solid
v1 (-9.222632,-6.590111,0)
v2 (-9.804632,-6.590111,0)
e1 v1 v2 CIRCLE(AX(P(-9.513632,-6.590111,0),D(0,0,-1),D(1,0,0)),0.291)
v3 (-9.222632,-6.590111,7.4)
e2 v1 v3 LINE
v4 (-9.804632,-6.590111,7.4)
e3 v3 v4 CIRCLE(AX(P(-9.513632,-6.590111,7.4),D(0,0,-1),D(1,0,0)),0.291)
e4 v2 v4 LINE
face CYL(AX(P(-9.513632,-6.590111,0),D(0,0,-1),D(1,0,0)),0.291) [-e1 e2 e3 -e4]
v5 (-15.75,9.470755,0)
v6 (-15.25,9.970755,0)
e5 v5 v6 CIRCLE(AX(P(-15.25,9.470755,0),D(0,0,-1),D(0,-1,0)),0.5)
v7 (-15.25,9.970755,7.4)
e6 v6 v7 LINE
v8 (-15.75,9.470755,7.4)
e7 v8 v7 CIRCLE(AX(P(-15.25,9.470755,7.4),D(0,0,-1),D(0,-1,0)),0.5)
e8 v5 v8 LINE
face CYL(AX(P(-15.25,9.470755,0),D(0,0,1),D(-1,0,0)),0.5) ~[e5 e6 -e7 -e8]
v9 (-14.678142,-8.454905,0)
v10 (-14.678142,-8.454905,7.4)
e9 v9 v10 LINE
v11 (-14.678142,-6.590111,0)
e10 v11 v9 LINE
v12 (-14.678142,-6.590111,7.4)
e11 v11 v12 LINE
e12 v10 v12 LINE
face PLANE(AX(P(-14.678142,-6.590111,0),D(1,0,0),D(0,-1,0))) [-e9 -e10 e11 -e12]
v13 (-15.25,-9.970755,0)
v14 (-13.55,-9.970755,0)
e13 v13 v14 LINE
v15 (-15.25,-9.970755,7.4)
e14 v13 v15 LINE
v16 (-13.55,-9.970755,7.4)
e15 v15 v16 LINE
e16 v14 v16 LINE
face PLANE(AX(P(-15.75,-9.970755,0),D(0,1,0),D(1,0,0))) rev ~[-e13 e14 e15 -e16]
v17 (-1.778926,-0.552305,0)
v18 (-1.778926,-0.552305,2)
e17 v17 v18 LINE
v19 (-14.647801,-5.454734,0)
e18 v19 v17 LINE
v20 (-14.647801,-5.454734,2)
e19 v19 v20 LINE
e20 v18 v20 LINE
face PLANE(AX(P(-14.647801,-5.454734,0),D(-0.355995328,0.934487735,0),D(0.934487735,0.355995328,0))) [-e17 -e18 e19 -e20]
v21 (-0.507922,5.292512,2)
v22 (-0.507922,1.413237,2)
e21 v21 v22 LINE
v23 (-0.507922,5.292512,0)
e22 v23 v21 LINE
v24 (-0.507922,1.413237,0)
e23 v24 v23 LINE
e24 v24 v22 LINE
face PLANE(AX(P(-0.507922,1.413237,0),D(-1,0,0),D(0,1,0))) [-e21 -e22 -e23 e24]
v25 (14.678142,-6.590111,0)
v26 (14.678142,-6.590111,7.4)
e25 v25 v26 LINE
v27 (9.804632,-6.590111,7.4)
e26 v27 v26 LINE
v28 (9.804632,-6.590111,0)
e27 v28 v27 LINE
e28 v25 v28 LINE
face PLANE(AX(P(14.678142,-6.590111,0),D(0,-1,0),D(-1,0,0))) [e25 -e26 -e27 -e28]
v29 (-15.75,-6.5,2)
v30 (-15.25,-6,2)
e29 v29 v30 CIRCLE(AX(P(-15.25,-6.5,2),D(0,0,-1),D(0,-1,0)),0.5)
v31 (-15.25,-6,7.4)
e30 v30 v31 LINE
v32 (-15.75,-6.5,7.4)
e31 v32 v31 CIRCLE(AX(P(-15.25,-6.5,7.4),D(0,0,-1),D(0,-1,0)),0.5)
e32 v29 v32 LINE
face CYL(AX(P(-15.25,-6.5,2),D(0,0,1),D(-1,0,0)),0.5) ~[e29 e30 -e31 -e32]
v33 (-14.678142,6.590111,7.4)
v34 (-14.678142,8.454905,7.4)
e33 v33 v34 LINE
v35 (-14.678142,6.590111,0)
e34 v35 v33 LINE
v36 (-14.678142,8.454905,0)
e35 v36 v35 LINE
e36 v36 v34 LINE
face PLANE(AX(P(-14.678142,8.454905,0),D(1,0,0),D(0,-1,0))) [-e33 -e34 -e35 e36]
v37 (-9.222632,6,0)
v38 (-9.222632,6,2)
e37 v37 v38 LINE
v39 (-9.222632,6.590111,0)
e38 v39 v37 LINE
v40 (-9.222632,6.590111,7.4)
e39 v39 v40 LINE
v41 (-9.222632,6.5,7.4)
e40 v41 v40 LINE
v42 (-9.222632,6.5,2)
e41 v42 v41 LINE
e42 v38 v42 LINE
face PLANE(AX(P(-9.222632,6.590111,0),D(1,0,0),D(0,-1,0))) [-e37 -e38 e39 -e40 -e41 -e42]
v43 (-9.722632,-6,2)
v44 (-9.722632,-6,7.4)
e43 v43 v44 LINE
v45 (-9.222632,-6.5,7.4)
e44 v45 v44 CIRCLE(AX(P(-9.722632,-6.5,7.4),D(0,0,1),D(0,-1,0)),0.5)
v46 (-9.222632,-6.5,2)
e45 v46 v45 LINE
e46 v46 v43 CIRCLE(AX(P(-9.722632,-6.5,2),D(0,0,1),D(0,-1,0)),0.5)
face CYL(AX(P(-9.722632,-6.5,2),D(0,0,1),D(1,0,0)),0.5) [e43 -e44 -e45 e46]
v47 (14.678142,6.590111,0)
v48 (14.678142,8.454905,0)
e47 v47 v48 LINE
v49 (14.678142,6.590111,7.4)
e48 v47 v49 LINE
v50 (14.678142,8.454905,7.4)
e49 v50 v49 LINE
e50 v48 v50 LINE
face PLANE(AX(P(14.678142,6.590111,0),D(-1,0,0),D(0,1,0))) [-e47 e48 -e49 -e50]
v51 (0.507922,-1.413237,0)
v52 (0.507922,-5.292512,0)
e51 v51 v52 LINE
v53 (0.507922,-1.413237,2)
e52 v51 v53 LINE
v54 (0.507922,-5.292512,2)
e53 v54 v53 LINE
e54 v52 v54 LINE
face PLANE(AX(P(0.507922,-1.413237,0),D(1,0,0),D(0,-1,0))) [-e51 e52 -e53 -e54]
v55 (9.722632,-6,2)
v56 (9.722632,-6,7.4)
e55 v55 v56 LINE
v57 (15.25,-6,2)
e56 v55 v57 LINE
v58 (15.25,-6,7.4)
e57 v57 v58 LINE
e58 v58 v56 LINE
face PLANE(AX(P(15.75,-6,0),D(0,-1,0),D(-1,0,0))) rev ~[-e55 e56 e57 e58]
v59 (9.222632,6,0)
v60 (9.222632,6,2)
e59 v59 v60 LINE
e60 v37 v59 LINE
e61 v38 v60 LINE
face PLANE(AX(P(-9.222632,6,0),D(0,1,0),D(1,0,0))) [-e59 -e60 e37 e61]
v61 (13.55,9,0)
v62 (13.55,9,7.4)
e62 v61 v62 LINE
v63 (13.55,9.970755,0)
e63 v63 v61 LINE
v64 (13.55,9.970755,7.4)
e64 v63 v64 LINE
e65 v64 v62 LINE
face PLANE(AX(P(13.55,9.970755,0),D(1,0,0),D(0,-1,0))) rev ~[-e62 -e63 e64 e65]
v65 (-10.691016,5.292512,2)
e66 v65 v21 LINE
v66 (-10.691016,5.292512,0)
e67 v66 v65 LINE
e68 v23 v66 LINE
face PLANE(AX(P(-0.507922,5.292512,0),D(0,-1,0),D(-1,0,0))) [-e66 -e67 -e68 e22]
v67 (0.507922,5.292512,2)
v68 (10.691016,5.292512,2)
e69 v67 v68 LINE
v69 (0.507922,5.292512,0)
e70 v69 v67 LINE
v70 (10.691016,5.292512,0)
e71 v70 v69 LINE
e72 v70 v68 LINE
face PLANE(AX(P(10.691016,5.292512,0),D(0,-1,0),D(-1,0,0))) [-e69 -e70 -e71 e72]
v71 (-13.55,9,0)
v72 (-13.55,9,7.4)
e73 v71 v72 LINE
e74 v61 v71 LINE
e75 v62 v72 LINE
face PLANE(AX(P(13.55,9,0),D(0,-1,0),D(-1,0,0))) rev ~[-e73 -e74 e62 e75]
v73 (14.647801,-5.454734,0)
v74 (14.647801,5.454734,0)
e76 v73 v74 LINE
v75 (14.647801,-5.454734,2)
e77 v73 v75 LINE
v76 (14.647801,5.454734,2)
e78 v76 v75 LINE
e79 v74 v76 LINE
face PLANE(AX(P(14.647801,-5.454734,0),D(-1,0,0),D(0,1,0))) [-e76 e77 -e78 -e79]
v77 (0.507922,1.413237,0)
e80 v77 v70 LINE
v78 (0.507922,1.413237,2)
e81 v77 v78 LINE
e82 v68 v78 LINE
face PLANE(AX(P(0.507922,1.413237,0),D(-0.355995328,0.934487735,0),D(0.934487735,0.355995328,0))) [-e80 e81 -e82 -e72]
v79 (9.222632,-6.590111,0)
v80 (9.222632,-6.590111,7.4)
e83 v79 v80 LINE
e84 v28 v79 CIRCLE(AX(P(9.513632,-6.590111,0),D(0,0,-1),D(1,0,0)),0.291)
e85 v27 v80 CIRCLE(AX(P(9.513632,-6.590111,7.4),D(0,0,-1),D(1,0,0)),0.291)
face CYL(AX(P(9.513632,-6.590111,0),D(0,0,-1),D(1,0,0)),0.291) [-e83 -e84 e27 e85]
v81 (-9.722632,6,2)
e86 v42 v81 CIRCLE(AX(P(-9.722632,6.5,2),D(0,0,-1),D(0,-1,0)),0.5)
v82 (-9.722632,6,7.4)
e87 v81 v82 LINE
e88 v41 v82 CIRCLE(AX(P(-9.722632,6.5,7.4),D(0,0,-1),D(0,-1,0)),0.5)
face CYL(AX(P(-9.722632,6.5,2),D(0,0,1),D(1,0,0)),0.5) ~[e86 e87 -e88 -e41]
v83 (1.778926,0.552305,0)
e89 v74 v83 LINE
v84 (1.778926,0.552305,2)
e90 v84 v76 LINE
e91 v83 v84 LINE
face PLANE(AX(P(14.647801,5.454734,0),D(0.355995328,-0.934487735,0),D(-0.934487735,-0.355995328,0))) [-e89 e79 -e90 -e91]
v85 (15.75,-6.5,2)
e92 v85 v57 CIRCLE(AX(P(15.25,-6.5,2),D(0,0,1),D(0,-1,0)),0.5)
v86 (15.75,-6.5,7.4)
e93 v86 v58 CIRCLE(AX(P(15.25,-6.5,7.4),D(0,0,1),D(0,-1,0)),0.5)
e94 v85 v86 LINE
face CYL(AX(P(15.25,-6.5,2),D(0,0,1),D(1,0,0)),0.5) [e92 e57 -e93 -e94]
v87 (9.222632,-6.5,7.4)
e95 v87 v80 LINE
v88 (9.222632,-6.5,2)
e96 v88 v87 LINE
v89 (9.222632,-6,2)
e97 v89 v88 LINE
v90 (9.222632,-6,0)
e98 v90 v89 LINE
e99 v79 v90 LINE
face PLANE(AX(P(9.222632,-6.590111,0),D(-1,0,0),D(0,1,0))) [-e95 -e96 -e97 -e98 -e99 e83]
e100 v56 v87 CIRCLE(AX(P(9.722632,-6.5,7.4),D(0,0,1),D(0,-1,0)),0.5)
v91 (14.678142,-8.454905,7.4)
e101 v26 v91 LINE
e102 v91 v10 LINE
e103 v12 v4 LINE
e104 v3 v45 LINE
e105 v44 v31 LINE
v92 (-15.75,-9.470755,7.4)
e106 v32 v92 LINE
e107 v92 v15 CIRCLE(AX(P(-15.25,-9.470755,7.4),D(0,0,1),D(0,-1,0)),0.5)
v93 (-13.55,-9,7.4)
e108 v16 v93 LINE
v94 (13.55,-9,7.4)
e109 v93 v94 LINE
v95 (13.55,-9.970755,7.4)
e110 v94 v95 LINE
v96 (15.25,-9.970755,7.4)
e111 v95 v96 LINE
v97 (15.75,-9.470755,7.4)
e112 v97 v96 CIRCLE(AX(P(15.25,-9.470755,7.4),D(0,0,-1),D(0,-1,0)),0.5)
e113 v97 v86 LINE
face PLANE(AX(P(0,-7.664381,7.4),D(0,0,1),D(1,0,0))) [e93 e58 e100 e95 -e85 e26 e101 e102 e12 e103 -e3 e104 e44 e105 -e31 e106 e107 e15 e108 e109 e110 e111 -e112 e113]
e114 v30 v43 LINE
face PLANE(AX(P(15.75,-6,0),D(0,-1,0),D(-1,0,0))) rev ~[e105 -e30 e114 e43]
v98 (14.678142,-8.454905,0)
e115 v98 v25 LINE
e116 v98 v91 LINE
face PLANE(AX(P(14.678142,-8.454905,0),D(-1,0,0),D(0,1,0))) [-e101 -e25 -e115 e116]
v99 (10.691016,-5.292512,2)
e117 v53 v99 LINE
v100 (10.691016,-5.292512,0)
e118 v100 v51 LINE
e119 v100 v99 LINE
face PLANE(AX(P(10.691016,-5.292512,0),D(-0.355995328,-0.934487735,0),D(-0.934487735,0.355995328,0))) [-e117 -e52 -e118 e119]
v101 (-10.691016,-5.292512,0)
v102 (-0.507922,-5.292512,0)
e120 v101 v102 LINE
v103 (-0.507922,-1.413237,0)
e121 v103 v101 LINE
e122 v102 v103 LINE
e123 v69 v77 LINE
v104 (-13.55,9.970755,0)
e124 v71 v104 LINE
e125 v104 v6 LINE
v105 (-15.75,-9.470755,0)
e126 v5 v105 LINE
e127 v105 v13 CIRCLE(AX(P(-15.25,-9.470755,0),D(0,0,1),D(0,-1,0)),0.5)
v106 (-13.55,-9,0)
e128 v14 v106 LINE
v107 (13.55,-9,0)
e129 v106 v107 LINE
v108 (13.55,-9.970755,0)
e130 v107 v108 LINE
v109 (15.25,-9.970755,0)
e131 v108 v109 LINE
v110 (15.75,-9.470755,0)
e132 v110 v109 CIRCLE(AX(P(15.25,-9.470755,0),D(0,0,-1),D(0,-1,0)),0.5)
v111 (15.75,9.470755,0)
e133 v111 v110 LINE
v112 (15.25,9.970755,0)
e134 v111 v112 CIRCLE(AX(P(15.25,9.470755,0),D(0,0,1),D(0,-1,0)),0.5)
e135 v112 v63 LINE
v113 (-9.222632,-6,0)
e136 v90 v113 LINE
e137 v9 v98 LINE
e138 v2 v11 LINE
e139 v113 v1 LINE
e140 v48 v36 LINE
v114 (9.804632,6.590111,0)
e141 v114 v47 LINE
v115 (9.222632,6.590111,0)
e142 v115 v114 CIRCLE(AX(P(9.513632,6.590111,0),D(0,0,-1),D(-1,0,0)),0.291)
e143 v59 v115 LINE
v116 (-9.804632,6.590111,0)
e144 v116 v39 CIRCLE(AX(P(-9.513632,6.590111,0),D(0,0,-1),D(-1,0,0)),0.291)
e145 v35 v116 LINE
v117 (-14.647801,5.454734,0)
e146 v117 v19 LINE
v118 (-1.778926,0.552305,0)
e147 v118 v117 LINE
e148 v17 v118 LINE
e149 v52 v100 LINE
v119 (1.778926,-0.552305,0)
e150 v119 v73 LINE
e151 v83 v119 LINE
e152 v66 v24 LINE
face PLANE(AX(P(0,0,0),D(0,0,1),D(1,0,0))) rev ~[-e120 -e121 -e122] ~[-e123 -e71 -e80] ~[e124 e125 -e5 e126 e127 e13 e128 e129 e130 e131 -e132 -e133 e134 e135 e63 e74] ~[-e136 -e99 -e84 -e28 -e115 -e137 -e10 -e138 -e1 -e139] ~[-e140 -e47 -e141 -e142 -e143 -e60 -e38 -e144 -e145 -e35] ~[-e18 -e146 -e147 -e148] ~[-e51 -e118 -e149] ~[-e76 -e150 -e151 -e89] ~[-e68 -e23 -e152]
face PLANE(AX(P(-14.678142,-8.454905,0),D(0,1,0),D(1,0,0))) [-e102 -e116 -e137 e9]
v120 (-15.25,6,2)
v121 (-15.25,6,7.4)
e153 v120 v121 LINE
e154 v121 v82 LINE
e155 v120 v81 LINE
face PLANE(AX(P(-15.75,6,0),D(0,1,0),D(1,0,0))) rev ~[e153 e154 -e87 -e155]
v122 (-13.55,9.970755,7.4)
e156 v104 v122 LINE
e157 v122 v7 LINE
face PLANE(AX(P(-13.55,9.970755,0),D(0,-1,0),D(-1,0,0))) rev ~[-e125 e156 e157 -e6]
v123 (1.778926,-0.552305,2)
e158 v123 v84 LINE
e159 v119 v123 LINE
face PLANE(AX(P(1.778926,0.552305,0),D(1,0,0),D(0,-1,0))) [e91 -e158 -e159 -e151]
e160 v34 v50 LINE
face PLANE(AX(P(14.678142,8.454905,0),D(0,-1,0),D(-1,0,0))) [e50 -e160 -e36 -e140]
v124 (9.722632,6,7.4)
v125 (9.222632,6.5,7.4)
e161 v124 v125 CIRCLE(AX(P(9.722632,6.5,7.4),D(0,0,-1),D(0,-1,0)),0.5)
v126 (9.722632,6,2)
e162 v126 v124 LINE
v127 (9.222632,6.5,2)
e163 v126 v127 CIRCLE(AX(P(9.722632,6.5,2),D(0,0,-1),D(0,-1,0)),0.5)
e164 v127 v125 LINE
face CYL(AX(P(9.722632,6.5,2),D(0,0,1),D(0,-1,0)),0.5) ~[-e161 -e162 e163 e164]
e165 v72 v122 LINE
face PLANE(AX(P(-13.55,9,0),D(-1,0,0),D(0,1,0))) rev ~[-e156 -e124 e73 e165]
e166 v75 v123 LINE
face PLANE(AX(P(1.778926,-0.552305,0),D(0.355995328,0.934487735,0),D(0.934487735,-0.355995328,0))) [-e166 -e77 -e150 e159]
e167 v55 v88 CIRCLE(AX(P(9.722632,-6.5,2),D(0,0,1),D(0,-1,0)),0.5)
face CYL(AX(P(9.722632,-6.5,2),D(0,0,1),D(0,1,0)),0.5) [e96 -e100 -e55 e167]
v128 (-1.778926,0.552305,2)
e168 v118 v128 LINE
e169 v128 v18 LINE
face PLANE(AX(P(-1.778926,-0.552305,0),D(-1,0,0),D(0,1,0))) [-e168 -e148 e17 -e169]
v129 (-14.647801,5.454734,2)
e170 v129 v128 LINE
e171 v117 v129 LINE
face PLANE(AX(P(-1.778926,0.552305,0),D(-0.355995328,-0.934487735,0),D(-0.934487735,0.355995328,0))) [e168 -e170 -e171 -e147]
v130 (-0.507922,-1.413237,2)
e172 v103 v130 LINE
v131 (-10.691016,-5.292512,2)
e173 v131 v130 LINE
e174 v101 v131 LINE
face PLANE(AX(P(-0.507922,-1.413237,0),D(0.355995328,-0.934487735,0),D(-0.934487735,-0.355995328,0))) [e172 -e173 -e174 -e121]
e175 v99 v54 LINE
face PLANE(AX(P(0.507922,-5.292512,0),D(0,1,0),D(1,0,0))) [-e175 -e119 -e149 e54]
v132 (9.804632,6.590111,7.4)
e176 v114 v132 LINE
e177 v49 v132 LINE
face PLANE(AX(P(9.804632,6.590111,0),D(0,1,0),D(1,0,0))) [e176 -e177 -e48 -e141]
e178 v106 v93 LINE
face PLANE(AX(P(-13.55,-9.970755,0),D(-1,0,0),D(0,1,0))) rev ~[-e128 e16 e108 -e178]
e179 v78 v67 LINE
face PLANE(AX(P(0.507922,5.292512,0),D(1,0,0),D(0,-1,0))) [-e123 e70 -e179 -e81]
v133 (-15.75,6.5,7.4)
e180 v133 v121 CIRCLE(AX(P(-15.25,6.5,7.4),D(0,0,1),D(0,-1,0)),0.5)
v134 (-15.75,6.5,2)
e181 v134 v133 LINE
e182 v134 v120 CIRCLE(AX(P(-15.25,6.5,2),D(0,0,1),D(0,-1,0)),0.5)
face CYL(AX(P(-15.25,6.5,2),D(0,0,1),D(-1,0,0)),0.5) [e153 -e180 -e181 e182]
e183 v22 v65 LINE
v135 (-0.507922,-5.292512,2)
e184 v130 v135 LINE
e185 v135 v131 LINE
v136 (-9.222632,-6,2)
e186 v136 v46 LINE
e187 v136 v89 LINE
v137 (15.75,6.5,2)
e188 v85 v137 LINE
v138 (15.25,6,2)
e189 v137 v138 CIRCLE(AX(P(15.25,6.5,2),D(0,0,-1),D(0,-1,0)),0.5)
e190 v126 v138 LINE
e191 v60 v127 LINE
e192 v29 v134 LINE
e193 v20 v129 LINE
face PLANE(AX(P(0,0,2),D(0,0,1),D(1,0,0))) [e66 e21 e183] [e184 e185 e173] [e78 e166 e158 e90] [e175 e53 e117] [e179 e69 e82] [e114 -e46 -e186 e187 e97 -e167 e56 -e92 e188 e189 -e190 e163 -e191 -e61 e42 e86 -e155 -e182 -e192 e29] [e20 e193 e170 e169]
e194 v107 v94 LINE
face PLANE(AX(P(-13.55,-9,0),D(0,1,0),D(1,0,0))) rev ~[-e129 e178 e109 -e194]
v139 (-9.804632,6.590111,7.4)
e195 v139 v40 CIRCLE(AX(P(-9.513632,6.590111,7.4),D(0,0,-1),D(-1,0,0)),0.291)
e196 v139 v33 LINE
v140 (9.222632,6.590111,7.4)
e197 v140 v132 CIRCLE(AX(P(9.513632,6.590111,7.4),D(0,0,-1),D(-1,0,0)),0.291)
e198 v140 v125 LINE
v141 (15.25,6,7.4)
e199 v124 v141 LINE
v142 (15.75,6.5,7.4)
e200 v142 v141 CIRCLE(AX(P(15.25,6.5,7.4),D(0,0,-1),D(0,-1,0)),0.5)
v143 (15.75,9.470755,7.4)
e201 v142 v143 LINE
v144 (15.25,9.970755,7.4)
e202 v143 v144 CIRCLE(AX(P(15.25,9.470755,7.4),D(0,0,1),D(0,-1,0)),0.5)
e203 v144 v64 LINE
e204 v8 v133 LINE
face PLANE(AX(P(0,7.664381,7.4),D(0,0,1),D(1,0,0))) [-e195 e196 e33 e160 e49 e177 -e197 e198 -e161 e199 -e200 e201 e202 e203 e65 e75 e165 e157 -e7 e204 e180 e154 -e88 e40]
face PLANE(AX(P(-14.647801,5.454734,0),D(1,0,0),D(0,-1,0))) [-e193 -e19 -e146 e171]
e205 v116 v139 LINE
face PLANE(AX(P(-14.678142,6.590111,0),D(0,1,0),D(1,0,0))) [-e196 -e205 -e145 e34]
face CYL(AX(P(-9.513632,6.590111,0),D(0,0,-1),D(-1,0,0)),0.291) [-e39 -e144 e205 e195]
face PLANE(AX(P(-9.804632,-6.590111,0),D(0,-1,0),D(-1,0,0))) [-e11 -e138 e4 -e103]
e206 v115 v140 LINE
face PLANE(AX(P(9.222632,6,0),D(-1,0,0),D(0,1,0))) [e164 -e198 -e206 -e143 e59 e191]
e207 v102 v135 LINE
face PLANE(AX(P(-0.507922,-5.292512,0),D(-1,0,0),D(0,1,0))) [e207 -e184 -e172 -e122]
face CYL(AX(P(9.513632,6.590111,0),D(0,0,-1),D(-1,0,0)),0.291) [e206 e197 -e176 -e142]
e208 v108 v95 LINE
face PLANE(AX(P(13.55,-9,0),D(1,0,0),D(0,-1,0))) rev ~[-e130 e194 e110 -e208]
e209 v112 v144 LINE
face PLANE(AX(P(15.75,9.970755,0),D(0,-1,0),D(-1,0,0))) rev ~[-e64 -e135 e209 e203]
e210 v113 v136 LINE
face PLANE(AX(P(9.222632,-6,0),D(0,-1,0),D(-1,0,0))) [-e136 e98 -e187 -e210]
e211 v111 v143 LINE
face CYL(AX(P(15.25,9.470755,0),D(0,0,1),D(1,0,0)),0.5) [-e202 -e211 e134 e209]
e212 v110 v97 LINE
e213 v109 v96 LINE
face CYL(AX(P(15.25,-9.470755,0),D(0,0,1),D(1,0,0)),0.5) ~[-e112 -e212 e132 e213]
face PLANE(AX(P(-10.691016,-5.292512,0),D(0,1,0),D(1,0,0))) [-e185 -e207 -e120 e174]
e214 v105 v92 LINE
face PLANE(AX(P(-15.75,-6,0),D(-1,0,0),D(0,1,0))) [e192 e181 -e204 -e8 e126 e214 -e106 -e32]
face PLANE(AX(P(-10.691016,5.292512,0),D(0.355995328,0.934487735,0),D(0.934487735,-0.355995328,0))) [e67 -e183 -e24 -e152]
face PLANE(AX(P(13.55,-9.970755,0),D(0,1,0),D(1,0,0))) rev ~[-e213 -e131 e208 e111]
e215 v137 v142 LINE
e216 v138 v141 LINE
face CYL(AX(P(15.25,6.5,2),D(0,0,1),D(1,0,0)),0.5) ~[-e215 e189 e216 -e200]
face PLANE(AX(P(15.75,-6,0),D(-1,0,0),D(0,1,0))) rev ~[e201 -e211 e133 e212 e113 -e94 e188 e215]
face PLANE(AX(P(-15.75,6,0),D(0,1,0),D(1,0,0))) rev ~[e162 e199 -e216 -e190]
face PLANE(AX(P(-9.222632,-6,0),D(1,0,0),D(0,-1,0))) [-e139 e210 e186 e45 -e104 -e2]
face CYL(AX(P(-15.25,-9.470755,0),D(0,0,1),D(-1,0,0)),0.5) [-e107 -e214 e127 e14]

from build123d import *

# Parameters (mm, degrees)
F1_DEPTH = 7.4
F0_W     = 31.5
F0_H     = 12
F2_DEPTH = 2
F4_DEPTH = 25
F5_R     = 0.5
F6_R     = 0.5


# Not quite as in the source:
# - a feature names something its author has since deleted; it is built from what else it names


with BuildPart() as f1:
    # F0 (on Top) → F1 (new body)
    with BuildSketch(Plane.XY):
        Polygon((15.75, -9), (15.75, -6), (-15.75, -6), (-15.75, -9), (-15.75, -9.970754717), (-13.55, -9.970754717), (-13.55, -9), (13.55, -9), (13.55, -9.970754717), (15.75, -9.970754717), align=None)
    extrude(amount=F1_DEPTH)



with BuildPart() as f1b:
    # F0 (on Top) → F1, piece 2 (new body)
    with BuildSketch(Plane.XY):
        Polygon((13.55, 9.970754717), (13.55, 9), (-13.55, 9), (-13.55, 9.970754717), (-15.75, 9.970754717), (-15.75, 9), (-15.75, 6), (15.75, 6), (15.75, 9), (15.75, 9.970754717), align=None)
    extrude(amount=F1_DEPTH)


with BuildPart() as f1_1:
    add(f1.part)

    add(f1b.part)  # F2 merges F1b
    # F0 (on Top) → F2 (join)
    with BuildSketch(Plane.XY):
        Rectangle(F0_W, F0_H)
    extrude(amount=F2_DEPTH)

    # F3 (on face) → F4 (cut)
    with BuildSketch(Plane.XY):
        Polygon((-0.5079215625, -1.4132374693), (-10.6910164902, -5.2925117274), (-0.5079215625, -5.2925117274), align=None)
        Polygon((10.6910164902, -5.2925117274), (0.5079215625, -1.4132374693), (0.5079215625, -5.2925117274), align=None)
        Polygon((1.7789258686, -0.5523047257), (14.6478014067, -5.4547335021), (14.6478014067, -0.5523047257), (14.6478014067, 0.5523047257), (14.6478014067, 5.4547335021), (1.7789258686, 0.5523047257), align=None)
        Polygon((0.5079215625, 1.4132374693), (10.6910164902, 5.2925117274), (0.5079215625, 5.2925117274), align=None)
        Polygon((-0.5079215625, 5.2925117274), (-10.6910164902, 5.2925117274), (-0.5079215625, 1.4132374693), align=None)
        with BuildLine():
            Line((-9.222632274, 6), (9.222632274, 6))
            Line((9.222632274, 6), (9.222632274, 6.5901111811))
            ThreePointArc((9.222632274, 6.5901111811), (9.513632274, 6.8811111811), (9.804632274, 6.5901111811))
            Line((9.804632274, 6.5901111811), (13.0790583789, 6.5901111811))
            Line((13.0790583789, 6.5901111811), (13.7675590813, 6.5901111811))
            Line((13.7675590813, 6.5901111811), (14.6781420335, 6.5901111811))
            Line((14.6781420335, 6.5901111811), (14.6781420335, 8.4549048916))
            Line((14.6781420335, 8.4549048916), (13.7675590813, 8.4549048916))
            Line((13.7675590813, 8.4549048916), (13.0790583789, 8.4549048916))
            Line((13.0790583789, 8.4549048916), (7.4084047228, 8.4549048916))
            Line((7.4084047228, 8.4549048916), (6.8271243945, 8.4549048916))
            Line((6.8271243945, 8.4549048916), (-6.8271243945, 8.4549048916))
            Line((-6.8271243945, 8.4549048916), (-7.4084047228, 8.4549048916))
            Line((-7.4084047228, 8.4549048916), (-13.0790583789, 8.4549048916))
            Line((-13.0790583789, 8.4549048916), (-13.7675590813, 8.4549048916))
            Line((-13.7675590813, 8.4549048916), (-14.6781420335, 8.4549048916))
            Line((-14.6781420335, 8.4549048916), (-14.6781420335, 6.5901111811))
            Line((-14.6781420335, 6.5901111811), (-13.7675590813, 6.5901111811))
            Line((-13.7675590813, 6.5901111811), (-13.0790583789, 6.5901111811))
            Line((-13.0790583789, 6.5901111811), (-9.804632274, 6.5901111811))
            ThreePointArc((-9.804632274, 6.5901111811), (-9.513632274, 6.8811111811), (-9.222632274, 6.5901111811))
            Line((-9.222632274, 6.5901111811), (-9.222632274, 6))
        make_face()
        Polygon((-14.6478014067, 5.4547335021), (-14.6478014067, 0.5523047257), (-14.6478014067, -0.5523047257), (-14.6478014067, -5.4547335021), (-1.7789258686, -0.5523047257), (-1.7789258686, 0.5523047257), align=None)
        with BuildLine():
            Line((9.222632274, -6.5901111811), (9.222632274, -6))
            Line((9.222632274, -6), (-9.222632274, -6))
            Line((-9.222632274, -6), (-9.222632274, -6.5901111811))
            ThreePointArc((-9.222632274, -6.5901111811), (-9.513632274, -6.8811111811), (-9.804632274, -6.5901111811))
            Line((-9.804632274, -6.5901111811), (-13.0790583789, -6.5901111811))
            Line((-13.0790583789, -6.5901111811), (-13.7675590813, -6.5901111811))
            Line((-13.7675590813, -6.5901111811), (-14.6781420335, -6.5901111811))
            Line((-14.6781420335, -6.5901111811), (-14.6781420335, -8.4549048916))
            Line((-14.6781420335, -8.4549048916), (-13.7675590813, -8.4549048916))
            Line((-13.7675590813, -8.4549048916), (-13.0790583789, -8.4549048916))
            Line((-13.0790583789, -8.4549048916), (-7.4084047228, -8.4549048916))
            Line((-7.4084047228, -8.4549048916), (-6.8271243945, -8.4549048916))
            Line((-6.8271243945, -8.4549048916), (6.8271243945, -8.4549048916))
            Line((6.8271243945, -8.4549048916), (7.4084047228, -8.4549048916))
            Line((7.4084047228, -8.4549048916), (13.0790583789, -8.4549048916))
            Line((13.0790583789, -8.4549048916), (13.7675590813, -8.4549048916))
            Line((13.7675590813, -8.4549048916), (14.6781420335, -8.4549048916))
            Line((14.6781420335, -8.4549048916), (14.6781420335, -6.5901111811))
            Line((14.6781420335, -6.5901111811), (13.7675590813, -6.5901111811))
            Line((13.7675590813, -6.5901111811), (13.0790583789, -6.5901111811))
            Line((13.0790583789, -6.5901111811), (9.804632274, -6.5901111811))
            ThreePointArc((9.804632274, -6.5901111811), (9.513632274, -6.8811111811), (9.222632274, -6.5901111811))
        make_face()
    extrude(amount=F4_DEPTH, mode=Mode.SUBTRACT)

    # F5
    f5_edges = [f1_1.edges().sort_by_distance(p)[0] for p in [
        (-15.75, 6, 4.7),
        (-15.75, -6, 4.7),
        (15.75, 6, 4.7),
        (15.75, -6, 4.7),
        (15.75, -9.970755, 3.7),
        (-15.75, -9.970755, 3.7),
        (-15.75, 9.970755, 3.7),
        (15.75, 9.970755, 3.7),
    ]]
    fillet(f5_edges, radius=F5_R)

    # F6
    f6_edges = [f1_1.edges().sort_by_distance(p)[0] for p in [
        (-9.222632, 6, 4.7),
        (9.222632, 6, 4.7),
        (9.222632, -6, 4.7),
        (-9.222632, -6, 4.7),
    ]]
    fillet(f6_edges, radius=F6_R)


solid = f1_1.part
